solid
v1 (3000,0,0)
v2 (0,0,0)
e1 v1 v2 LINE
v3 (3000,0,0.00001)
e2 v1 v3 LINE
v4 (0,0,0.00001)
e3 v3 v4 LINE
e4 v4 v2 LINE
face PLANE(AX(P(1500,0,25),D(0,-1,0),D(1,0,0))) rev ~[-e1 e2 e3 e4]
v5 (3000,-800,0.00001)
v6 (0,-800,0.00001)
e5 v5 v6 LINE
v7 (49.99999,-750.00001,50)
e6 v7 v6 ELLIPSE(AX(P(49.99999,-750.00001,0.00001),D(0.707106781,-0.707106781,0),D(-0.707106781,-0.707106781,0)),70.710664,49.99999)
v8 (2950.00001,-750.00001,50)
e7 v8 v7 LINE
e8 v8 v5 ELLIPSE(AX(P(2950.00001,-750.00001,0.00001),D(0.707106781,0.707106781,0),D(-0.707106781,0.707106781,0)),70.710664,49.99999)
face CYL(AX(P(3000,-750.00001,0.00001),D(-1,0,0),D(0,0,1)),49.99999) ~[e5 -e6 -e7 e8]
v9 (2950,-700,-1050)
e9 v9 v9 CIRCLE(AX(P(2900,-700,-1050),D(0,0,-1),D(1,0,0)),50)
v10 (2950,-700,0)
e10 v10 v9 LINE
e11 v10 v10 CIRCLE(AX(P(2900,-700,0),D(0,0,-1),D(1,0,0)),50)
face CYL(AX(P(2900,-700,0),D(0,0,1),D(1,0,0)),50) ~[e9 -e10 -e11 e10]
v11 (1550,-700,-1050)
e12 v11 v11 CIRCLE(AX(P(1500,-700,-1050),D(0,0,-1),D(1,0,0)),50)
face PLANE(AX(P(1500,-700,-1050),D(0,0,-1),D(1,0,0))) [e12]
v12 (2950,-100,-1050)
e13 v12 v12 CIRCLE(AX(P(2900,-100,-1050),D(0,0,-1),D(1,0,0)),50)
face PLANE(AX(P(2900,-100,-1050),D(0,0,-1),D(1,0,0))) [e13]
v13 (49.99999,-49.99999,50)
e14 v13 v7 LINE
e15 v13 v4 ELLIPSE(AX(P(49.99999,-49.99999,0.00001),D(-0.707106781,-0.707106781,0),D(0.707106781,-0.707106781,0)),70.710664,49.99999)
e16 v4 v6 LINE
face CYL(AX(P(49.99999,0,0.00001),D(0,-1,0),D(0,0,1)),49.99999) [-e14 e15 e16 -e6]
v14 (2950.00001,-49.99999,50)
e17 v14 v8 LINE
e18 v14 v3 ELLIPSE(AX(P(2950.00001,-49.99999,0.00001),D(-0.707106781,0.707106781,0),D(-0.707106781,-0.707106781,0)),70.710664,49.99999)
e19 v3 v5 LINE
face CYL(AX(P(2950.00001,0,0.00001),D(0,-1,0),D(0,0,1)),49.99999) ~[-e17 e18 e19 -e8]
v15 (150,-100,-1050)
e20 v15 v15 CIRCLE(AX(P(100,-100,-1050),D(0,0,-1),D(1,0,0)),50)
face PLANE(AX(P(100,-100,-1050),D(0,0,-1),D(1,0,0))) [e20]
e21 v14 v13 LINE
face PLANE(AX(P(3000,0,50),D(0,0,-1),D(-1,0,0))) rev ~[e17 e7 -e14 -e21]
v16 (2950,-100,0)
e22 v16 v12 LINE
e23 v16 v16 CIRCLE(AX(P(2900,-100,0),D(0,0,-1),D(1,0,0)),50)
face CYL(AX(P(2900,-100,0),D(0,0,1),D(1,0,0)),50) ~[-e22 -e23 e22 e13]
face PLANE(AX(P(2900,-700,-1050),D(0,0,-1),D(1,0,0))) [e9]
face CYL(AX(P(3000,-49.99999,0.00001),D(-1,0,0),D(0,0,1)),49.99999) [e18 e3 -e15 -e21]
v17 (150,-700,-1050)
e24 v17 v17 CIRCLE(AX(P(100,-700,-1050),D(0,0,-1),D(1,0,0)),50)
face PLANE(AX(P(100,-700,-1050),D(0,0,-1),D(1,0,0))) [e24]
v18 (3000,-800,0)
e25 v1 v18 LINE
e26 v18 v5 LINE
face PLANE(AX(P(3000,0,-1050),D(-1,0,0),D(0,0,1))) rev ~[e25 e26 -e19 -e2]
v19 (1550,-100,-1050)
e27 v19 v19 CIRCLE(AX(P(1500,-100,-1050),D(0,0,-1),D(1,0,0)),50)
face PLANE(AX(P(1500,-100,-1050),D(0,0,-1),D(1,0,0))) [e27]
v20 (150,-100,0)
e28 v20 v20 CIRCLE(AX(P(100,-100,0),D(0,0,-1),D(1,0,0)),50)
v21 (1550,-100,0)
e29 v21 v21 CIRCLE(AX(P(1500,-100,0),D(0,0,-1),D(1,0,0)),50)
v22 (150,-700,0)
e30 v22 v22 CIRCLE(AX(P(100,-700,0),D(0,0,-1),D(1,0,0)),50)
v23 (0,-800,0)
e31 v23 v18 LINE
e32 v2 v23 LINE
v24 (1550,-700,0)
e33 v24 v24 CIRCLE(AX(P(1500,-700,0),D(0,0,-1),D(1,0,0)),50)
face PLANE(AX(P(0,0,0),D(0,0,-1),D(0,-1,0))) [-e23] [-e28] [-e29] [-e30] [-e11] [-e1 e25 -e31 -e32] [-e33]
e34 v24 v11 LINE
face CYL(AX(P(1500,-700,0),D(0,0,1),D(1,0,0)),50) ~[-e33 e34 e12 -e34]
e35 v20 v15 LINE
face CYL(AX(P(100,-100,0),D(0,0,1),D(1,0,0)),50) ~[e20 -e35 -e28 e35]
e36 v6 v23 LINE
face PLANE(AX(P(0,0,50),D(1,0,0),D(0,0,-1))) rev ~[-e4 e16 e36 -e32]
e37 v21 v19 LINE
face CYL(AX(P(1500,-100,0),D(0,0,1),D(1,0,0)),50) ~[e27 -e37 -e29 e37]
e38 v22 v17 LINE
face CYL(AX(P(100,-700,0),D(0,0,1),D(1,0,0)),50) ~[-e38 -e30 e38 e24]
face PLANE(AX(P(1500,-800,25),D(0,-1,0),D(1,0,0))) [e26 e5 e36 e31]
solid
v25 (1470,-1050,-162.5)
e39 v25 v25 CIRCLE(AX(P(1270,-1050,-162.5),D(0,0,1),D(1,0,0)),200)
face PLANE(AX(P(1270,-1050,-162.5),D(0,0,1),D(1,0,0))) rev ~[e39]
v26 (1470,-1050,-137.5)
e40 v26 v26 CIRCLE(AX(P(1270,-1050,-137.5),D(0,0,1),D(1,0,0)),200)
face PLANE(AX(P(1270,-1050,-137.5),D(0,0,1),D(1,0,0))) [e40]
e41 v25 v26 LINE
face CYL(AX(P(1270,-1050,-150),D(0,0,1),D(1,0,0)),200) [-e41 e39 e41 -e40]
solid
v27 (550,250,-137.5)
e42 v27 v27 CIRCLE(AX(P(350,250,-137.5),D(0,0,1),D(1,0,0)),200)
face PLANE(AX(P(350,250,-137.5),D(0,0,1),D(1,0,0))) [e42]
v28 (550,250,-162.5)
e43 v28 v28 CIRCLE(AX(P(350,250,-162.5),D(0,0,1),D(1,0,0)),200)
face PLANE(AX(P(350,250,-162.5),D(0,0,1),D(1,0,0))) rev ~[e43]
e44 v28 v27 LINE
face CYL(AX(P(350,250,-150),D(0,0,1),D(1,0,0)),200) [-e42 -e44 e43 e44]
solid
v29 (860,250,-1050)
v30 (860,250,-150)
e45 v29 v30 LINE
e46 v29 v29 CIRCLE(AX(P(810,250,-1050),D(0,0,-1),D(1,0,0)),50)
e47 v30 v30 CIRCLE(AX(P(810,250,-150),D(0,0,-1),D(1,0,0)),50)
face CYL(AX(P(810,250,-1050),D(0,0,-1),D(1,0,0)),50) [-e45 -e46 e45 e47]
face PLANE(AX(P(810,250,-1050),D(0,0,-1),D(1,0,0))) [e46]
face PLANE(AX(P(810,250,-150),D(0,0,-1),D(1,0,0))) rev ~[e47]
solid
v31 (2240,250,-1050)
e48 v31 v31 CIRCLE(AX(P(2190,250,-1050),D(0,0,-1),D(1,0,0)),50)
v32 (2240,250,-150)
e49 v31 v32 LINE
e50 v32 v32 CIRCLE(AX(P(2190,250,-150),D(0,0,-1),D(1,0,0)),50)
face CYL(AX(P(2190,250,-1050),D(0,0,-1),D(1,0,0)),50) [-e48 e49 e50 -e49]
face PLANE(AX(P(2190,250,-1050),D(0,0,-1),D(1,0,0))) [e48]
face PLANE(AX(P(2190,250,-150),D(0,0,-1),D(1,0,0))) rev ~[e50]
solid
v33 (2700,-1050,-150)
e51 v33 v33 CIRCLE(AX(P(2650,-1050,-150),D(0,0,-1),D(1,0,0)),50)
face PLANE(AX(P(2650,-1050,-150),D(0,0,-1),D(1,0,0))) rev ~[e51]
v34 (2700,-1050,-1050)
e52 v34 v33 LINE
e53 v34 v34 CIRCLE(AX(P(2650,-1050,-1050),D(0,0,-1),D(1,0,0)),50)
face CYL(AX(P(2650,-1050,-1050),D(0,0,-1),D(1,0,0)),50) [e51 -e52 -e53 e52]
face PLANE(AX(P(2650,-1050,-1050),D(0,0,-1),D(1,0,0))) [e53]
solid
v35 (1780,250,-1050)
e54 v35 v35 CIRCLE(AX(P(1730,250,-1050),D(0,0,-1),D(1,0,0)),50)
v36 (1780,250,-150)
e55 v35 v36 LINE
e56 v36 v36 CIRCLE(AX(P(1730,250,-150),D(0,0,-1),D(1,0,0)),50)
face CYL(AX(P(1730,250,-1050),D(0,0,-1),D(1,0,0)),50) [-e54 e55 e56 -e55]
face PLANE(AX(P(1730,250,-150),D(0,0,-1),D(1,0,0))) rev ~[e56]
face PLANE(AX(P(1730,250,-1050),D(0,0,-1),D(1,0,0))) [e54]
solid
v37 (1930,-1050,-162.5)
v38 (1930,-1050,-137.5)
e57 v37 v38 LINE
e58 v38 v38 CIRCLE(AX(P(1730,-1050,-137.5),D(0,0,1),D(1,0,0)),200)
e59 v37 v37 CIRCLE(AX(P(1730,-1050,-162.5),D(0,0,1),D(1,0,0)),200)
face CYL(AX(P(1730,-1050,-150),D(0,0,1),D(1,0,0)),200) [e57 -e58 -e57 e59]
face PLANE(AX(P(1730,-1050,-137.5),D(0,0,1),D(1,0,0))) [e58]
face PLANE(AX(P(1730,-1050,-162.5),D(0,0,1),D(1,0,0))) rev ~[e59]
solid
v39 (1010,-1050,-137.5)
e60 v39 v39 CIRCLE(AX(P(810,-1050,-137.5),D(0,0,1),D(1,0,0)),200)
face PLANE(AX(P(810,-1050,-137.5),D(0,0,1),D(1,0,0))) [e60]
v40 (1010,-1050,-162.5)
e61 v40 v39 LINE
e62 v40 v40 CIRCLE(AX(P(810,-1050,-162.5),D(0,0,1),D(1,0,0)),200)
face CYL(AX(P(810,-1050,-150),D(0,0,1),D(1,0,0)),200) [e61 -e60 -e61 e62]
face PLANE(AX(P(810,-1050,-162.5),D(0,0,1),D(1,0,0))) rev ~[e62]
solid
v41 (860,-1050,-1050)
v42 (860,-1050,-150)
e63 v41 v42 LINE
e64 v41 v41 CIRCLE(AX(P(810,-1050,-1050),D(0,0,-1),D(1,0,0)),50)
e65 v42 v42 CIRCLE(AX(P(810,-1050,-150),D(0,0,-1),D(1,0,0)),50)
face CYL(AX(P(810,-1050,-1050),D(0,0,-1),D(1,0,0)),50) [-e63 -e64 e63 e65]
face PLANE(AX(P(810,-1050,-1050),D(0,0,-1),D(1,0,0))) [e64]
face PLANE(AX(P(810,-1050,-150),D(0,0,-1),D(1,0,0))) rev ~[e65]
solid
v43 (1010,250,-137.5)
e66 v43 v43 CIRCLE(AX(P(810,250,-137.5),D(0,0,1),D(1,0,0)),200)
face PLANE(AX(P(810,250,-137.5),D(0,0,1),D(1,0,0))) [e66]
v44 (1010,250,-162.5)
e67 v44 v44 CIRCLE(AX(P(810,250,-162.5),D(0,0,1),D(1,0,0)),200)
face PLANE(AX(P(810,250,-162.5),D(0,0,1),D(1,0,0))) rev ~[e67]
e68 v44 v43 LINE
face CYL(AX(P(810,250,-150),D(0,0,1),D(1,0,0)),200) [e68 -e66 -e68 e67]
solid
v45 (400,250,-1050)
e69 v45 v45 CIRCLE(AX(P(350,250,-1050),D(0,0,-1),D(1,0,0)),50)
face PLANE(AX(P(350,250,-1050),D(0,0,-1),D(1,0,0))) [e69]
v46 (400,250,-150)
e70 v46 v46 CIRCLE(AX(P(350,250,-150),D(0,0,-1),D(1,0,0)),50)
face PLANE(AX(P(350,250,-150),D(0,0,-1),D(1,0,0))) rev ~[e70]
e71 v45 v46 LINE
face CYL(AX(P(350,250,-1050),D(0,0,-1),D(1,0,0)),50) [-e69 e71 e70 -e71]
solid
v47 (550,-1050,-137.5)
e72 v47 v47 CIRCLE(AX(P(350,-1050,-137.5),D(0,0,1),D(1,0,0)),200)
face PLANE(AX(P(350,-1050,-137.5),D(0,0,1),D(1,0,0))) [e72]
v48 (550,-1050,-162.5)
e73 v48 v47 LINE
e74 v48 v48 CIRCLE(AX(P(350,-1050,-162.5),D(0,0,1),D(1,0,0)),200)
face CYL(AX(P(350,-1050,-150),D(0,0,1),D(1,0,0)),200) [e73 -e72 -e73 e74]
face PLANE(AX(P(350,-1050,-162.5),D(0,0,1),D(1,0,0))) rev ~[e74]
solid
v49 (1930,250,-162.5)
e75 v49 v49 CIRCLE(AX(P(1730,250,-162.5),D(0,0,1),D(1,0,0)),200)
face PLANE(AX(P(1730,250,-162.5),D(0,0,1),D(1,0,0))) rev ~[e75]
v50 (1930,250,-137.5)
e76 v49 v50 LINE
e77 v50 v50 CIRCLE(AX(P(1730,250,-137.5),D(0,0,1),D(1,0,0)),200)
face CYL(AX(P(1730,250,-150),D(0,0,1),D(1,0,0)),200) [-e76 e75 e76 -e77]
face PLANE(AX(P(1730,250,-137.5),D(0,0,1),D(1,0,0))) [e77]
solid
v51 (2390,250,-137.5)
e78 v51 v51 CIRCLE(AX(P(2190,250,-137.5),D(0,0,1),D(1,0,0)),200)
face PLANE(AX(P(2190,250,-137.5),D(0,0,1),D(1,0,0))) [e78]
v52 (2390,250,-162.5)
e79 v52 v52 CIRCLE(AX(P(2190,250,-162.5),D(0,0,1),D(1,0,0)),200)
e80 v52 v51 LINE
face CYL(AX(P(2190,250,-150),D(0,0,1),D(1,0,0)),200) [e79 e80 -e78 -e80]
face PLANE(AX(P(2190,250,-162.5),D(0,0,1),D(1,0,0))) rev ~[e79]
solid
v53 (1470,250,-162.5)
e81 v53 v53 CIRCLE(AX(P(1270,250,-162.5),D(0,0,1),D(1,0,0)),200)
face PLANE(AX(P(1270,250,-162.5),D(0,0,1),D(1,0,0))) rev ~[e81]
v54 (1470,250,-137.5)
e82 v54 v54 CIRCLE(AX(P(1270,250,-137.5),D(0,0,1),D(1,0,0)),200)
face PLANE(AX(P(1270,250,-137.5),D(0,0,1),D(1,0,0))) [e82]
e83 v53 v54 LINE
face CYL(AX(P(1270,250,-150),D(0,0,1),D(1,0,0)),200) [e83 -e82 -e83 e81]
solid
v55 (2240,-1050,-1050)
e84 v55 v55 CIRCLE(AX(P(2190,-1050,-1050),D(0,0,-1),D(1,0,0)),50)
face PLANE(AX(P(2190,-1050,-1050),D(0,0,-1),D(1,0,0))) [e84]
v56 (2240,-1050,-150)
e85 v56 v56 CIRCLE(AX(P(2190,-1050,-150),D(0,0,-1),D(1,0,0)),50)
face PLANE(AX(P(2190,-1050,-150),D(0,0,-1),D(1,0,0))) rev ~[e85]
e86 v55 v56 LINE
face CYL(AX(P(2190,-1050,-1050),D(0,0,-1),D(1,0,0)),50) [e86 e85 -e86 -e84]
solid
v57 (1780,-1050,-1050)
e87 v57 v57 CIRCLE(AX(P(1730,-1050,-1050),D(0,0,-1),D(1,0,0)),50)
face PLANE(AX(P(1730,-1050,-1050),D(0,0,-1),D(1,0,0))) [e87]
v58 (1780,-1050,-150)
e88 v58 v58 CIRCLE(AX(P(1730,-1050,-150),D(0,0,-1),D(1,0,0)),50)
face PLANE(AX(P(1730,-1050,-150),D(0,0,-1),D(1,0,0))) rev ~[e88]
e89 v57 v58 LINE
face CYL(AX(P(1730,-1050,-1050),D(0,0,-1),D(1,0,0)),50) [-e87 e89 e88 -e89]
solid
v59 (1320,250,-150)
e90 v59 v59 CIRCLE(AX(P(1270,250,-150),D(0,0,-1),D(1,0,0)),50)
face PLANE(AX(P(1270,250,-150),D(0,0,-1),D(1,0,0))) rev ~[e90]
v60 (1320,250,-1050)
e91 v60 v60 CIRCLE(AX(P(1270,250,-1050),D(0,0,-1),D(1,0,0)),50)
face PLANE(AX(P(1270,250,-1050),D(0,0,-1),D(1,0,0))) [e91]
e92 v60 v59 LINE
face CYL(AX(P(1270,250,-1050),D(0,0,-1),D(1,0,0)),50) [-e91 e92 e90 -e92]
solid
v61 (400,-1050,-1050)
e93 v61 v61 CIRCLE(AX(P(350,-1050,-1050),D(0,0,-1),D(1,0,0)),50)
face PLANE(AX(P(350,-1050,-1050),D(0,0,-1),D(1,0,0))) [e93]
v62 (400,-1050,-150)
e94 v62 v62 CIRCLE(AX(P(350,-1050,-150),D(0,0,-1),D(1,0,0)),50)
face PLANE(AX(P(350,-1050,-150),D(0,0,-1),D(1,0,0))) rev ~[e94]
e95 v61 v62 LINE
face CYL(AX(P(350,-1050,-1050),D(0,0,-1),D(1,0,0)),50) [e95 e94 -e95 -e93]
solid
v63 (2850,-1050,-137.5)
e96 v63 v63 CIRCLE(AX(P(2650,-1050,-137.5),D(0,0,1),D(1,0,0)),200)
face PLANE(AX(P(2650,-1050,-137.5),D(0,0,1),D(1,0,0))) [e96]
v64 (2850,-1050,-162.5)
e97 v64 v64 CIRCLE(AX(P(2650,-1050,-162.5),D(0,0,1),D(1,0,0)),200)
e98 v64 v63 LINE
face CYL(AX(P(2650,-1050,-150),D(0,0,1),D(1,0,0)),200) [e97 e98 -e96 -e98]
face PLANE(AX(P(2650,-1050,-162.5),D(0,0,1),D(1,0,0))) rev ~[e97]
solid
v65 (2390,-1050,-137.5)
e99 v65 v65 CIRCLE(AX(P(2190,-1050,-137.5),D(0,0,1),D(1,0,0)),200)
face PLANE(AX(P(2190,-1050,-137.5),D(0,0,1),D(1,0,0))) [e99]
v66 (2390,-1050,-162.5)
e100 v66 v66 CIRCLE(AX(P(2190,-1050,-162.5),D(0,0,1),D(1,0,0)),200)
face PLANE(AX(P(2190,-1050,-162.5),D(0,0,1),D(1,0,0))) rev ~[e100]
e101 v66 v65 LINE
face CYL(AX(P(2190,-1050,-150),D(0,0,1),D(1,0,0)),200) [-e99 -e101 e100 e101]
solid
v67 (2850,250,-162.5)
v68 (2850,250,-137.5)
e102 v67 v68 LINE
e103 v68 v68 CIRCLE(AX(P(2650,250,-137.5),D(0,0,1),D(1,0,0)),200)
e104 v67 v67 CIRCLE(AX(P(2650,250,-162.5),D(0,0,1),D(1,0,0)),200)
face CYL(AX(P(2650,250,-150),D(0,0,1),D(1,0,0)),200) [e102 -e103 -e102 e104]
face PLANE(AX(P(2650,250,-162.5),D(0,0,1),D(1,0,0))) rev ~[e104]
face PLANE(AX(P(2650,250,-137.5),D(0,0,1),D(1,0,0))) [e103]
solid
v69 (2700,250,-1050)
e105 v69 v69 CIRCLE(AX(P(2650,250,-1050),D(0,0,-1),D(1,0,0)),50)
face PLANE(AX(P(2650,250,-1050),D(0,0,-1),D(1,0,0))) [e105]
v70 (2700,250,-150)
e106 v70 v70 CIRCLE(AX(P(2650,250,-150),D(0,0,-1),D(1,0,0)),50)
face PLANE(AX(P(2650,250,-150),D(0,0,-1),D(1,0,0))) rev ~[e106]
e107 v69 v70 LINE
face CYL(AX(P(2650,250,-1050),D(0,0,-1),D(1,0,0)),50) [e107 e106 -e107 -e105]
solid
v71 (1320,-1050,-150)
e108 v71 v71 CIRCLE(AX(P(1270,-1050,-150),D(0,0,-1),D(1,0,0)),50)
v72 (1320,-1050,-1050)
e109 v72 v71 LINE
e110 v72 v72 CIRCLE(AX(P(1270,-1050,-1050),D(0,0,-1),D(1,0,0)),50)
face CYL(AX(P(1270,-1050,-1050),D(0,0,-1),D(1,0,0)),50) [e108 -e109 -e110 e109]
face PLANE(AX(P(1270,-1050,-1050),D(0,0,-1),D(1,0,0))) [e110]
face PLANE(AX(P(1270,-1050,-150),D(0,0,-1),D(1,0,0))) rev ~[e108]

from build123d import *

# Parameters (mm, degrees)
F0_W      = 50
F0_H      = 1050
F1_DEPTH  = 800
F2_R      = 49.99999
F3_R      = 50
F4_DEPTH  = 900
F5_R      = 200
F6_DEPTH  = 12.5
F7_W      = 800
F7_H      = 1050
F8_DEPTH  = 3000.001
F9_R      = 50
F10_DEPTH = 1050


# Not quite as in the source:
# - a fillet or chamfer is up to 0.001 mm smaller than in the source, because OpenCascade refuses the exact size


with BuildPart() as f1:
    # F0 (on Front) → F1 (new body)
    with BuildSketch(Plane.XZ):
        Polygon((3000, 50), (0, 50), (0, 0), (50, 0), (1450, 0), (1500, 0), (2950, 0), (3000, 0), align=None)
        with Locations((25, -525)):
            Rectangle(F0_W, F0_H)
        with Locations((2975, -525)):
            Rectangle(F0_W, F0_H)
        with Locations((1475, -525)):
            Rectangle(F0_W, F0_H)
    extrude(amount=F1_DEPTH)

    # F2 (radius 50 in the source; OpenCascade refuses exactly that, so slightly less here)
    f2_edges = [f1.edges().sort_by_distance(p)[0] for p in [
        (0, -400, 50),
        (1500, -800, 50),
        (1500, 0, 50),
        (3000, -400, 50),
    ]]
    fillet(f2_edges, radius=F2_R)

    # F7 (on face) → F8 (cut, through all)
    with BuildSketch(Plane(origin=(0, 0, 0), x_dir=(0, -1, 0), z_dir=(-1, 0, 0))):
        with Locations((400, -525)):
            Rectangle(F7_W, F7_H)
    extrude(amount=-F8_DEPTH, mode=Mode.SUBTRACT)

    # F9 (on face) → F10 (join, through all)
    with BuildSketch(Plane(origin=(0, 0, 0), x_dir=(1, 0, 0), z_dir=(0, 0, -1))):
        with Locations((100, 700)):
            Circle(F9_R)
        with Locations((100, 100)):
            Circle(F9_R)
        with Locations((1500, 700)):
            Circle(F9_R)
        with Locations((1500, 100)):
            Circle(F9_R)
        with Locations((2900, 700)):
            Circle(F9_R)
        with Locations((2900, 100)):
            Circle(F9_R)
    extrude(amount=F10_DEPTH)


with BuildPart() as f4:
    # F3 (on face) → F4 (new body)
    with BuildSketch(Plane(origin=(0, 0, -1050), x_dir=(1, 0, 0), z_dir=(0, 0, -1))):
        with Locations((350, -250)):
            Circle(F3_R)
    extrude(amount=-F4_DEPTH)


with BuildPart() as f4b:
    # F3 (on face) → F4, piece 2 (new body)
    with BuildSketch(Plane(origin=(0, 0, -1050), x_dir=(1, 0, 0), z_dir=(0, 0, -1))):
        with Locations((350, 1050)):
            Circle(F3_R)
    extrude(amount=-F4_DEPTH)


with BuildPart() as f4c:
    # F3 (on face) → F4, piece 3 (new body)
    with BuildSketch(Plane(origin=(0, 0, -1050), x_dir=(1, 0, 0), z_dir=(0, 0, -1))):
        with Locations((810, -250)):
            Circle(F3_R)
    extrude(amount=-F4_DEPTH)


with BuildPart() as f4d:
    # F3 (on face) → F4, piece 4 (new body)
    with BuildSketch(Plane(origin=(0, 0, -1050), x_dir=(1, 0, 0), z_dir=(0, 0, -1))):
        with Locations((810, 1050)):
            Circle(F3_R)
    extrude(amount=-F4_DEPTH)


with BuildPart() as f4e:
    # F3 (on face) → F4, piece 5 (new body)
    with BuildSketch(Plane(origin=(0, 0, -1050), x_dir=(1, 0, 0), z_dir=(0, 0, -1))):
        with Locations((1270, -250)):
            Circle(F3_R)
    extrude(amount=-F4_DEPTH)


with BuildPart() as f4f:
    # F3 (on face) → F4, piece 6 (new body)
    with BuildSketch(Plane(origin=(0, 0, -1050), x_dir=(1, 0, 0), z_dir=(0, 0, -1))):
        with Locations((1270, 1050)):
            Circle(F3_R)
    extrude(amount=-F4_DEPTH)


with BuildPart() as f4g:
    # F3 (on face) → F4, piece 7 (new body)
    with BuildSketch(Plane(origin=(0, 0, -1050), x_dir=(1, 0, 0), z_dir=(0, 0, -1))):
        with Locations((1730, -250)):
            Circle(F3_R)
    extrude(amount=-F4_DEPTH)


with BuildPart() as f4h:
    # F3 (on face) → F4, piece 8 (new body)
    with BuildSketch(Plane(origin=(0, 0, -1050), x_dir=(1, 0, 0), z_dir=(0, 0, -1))):
        with Locations((1730, 1050)):
            Circle(F3_R)
    extrude(amount=-F4_DEPTH)


with BuildPart() as f4i:
    # F3 (on face) → F4, piece 9 (new body)
    with BuildSketch(Plane(origin=(0, 0, -1050), x_dir=(1, 0, 0), z_dir=(0, 0, -1))):
        with Locations((2190, -250)):
            Circle(F3_R)
    extrude(amount=-F4_DEPTH)


with BuildPart() as f4j:
    # F3 (on face) → F4, piece 10 (new body)
    with BuildSketch(Plane(origin=(0, 0, -1050), x_dir=(1, 0, 0), z_dir=(0, 0, -1))):
        with Locations((2190, 1050)):
            Circle(F3_R)
    extrude(amount=-F4_DEPTH)


with BuildPart() as f4k:
    # F3 (on face) → F4, piece 11 (new body)
    with BuildSketch(Plane(origin=(0, 0, -1050), x_dir=(1, 0, 0), z_dir=(0, 0, -1))):
        with Locations((2650, -250)):
            Circle(F3_R)
    extrude(amount=-F4_DEPTH)


with BuildPart() as f4l:
    # F3 (on face) → F4, piece 12 (new body)
    with BuildSketch(Plane(origin=(0, 0, -1050), x_dir=(1, 0, 0), z_dir=(0, 0, -1))):
        with Locations((2650, 1050)):
            Circle(F3_R)
    extrude(amount=-F4_DEPTH)


with BuildPart() as f6:
    # F5 (on face) → F6 (new body, symmetric)
    with BuildSketch(Plane.XY.offset(-150)):
        with Locations((350, 250)):
            Circle(F5_R)
    extrude(amount=F6_DEPTH, both=True)


with BuildPart() as f6b:
    # F5 (on face) → F6, piece 2 (new body, symmetric)
    with BuildSketch(Plane.XY.offset(-150)):
        with Locations((350, -1050)):
            Circle(F5_R)
    extrude(amount=F6_DEPTH, both=True)


with BuildPart() as f6c:
    # F5 (on face) → F6, piece 3 (new body, symmetric)
    with BuildSketch(Plane.XY.offset(-150)):
        with Locations((810, 250)):
            Circle(F5_R)
    extrude(amount=F6_DEPTH, both=True)


with BuildPart() as f6d:
    # F5 (on face) → F6, piece 4 (new body, symmetric)
    with BuildSketch(Plane.XY.offset(-150)):
        with Locations((810, -1050)):
            Circle(F5_R)
    extrude(amount=F6_DEPTH, both=True)


with BuildPart() as f6e:
    # F5 (on face) → F6, piece 5 (new body, symmetric)
    with BuildSketch(Plane.XY.offset(-150)):
        with Locations((1270, 250)):
            Circle(F5_R)
    extrude(amount=F6_DEPTH, both=True)


with BuildPart() as f6f:
    # F5 (on face) → F6, piece 6 (new body, symmetric)
    with BuildSketch(Plane.XY.offset(-150)):
        with Locations((1270, -1050)):
            Circle(F5_R)
    extrude(amount=F6_DEPTH, both=True)


with BuildPart() as f6g:
    # F5 (on face) → F6, piece 7 (new body, symmetric)
    with BuildSketch(Plane.XY.offset(-150)):
        with Locations((1730, 250)):
            Circle(F5_R)
    extrude(amount=F6_DEPTH, both=True)


with BuildPart() as f6h:
    # F5 (on face) → F6, piece 8 (new body, symmetric)
    with BuildSketch(Plane.XY.offset(-150)):
        with Locations((1730, -1050)):
            Circle(F5_R)
    extrude(amount=F6_DEPTH, both=True)


with BuildPart() as f6i:
    # F5 (on face) → F6, piece 9 (new body, symmetric)
    with BuildSketch(Plane.XY.offset(-150)):
        with Locations((2190, 250)):
            Circle(F5_R)
    extrude(amount=F6_DEPTH, both=True)


with BuildPart() as f6j:
    # F5 (on face) → F6, piece 10 (new body, symmetric)
    with BuildSketch(Plane.XY.offset(-150)):
        with Locations((2190, -1050)):
            Circle(F5_R)
    extrude(amount=F6_DEPTH, both=True)


with BuildPart() as f6k:
    # F5 (on face) → F6, piece 11 (new body, symmetric)
    with BuildSketch(Plane.XY.offset(-150)):
        with Locations((2650, 250)):
            Circle(F5_R)
    extrude(amount=F6_DEPTH, both=True)


with BuildPart() as f6l:
    # F5 (on face) → F6, piece 12 (new body, symmetric)
    with BuildSketch(Plane.XY.offset(-150)):
        with Locations((2650, -1050)):
            Circle(F5_R)
    extrude(amount=F6_DEPTH, both=True)


solid = Compound([f1.part, f4.part, f4b.part, f4c.part, f4d.part, f4e.part, f4f.part, f4g.part, f4h.part, f4i.part, f4j.part, f4k.part, f4l.part, f6.part, f6b.part, f6c.part, f6d.part, f6e.part, f6f.part, f6g.part, f6h.part, f6i.part, f6j.part, f6k.part, f6l.part])
